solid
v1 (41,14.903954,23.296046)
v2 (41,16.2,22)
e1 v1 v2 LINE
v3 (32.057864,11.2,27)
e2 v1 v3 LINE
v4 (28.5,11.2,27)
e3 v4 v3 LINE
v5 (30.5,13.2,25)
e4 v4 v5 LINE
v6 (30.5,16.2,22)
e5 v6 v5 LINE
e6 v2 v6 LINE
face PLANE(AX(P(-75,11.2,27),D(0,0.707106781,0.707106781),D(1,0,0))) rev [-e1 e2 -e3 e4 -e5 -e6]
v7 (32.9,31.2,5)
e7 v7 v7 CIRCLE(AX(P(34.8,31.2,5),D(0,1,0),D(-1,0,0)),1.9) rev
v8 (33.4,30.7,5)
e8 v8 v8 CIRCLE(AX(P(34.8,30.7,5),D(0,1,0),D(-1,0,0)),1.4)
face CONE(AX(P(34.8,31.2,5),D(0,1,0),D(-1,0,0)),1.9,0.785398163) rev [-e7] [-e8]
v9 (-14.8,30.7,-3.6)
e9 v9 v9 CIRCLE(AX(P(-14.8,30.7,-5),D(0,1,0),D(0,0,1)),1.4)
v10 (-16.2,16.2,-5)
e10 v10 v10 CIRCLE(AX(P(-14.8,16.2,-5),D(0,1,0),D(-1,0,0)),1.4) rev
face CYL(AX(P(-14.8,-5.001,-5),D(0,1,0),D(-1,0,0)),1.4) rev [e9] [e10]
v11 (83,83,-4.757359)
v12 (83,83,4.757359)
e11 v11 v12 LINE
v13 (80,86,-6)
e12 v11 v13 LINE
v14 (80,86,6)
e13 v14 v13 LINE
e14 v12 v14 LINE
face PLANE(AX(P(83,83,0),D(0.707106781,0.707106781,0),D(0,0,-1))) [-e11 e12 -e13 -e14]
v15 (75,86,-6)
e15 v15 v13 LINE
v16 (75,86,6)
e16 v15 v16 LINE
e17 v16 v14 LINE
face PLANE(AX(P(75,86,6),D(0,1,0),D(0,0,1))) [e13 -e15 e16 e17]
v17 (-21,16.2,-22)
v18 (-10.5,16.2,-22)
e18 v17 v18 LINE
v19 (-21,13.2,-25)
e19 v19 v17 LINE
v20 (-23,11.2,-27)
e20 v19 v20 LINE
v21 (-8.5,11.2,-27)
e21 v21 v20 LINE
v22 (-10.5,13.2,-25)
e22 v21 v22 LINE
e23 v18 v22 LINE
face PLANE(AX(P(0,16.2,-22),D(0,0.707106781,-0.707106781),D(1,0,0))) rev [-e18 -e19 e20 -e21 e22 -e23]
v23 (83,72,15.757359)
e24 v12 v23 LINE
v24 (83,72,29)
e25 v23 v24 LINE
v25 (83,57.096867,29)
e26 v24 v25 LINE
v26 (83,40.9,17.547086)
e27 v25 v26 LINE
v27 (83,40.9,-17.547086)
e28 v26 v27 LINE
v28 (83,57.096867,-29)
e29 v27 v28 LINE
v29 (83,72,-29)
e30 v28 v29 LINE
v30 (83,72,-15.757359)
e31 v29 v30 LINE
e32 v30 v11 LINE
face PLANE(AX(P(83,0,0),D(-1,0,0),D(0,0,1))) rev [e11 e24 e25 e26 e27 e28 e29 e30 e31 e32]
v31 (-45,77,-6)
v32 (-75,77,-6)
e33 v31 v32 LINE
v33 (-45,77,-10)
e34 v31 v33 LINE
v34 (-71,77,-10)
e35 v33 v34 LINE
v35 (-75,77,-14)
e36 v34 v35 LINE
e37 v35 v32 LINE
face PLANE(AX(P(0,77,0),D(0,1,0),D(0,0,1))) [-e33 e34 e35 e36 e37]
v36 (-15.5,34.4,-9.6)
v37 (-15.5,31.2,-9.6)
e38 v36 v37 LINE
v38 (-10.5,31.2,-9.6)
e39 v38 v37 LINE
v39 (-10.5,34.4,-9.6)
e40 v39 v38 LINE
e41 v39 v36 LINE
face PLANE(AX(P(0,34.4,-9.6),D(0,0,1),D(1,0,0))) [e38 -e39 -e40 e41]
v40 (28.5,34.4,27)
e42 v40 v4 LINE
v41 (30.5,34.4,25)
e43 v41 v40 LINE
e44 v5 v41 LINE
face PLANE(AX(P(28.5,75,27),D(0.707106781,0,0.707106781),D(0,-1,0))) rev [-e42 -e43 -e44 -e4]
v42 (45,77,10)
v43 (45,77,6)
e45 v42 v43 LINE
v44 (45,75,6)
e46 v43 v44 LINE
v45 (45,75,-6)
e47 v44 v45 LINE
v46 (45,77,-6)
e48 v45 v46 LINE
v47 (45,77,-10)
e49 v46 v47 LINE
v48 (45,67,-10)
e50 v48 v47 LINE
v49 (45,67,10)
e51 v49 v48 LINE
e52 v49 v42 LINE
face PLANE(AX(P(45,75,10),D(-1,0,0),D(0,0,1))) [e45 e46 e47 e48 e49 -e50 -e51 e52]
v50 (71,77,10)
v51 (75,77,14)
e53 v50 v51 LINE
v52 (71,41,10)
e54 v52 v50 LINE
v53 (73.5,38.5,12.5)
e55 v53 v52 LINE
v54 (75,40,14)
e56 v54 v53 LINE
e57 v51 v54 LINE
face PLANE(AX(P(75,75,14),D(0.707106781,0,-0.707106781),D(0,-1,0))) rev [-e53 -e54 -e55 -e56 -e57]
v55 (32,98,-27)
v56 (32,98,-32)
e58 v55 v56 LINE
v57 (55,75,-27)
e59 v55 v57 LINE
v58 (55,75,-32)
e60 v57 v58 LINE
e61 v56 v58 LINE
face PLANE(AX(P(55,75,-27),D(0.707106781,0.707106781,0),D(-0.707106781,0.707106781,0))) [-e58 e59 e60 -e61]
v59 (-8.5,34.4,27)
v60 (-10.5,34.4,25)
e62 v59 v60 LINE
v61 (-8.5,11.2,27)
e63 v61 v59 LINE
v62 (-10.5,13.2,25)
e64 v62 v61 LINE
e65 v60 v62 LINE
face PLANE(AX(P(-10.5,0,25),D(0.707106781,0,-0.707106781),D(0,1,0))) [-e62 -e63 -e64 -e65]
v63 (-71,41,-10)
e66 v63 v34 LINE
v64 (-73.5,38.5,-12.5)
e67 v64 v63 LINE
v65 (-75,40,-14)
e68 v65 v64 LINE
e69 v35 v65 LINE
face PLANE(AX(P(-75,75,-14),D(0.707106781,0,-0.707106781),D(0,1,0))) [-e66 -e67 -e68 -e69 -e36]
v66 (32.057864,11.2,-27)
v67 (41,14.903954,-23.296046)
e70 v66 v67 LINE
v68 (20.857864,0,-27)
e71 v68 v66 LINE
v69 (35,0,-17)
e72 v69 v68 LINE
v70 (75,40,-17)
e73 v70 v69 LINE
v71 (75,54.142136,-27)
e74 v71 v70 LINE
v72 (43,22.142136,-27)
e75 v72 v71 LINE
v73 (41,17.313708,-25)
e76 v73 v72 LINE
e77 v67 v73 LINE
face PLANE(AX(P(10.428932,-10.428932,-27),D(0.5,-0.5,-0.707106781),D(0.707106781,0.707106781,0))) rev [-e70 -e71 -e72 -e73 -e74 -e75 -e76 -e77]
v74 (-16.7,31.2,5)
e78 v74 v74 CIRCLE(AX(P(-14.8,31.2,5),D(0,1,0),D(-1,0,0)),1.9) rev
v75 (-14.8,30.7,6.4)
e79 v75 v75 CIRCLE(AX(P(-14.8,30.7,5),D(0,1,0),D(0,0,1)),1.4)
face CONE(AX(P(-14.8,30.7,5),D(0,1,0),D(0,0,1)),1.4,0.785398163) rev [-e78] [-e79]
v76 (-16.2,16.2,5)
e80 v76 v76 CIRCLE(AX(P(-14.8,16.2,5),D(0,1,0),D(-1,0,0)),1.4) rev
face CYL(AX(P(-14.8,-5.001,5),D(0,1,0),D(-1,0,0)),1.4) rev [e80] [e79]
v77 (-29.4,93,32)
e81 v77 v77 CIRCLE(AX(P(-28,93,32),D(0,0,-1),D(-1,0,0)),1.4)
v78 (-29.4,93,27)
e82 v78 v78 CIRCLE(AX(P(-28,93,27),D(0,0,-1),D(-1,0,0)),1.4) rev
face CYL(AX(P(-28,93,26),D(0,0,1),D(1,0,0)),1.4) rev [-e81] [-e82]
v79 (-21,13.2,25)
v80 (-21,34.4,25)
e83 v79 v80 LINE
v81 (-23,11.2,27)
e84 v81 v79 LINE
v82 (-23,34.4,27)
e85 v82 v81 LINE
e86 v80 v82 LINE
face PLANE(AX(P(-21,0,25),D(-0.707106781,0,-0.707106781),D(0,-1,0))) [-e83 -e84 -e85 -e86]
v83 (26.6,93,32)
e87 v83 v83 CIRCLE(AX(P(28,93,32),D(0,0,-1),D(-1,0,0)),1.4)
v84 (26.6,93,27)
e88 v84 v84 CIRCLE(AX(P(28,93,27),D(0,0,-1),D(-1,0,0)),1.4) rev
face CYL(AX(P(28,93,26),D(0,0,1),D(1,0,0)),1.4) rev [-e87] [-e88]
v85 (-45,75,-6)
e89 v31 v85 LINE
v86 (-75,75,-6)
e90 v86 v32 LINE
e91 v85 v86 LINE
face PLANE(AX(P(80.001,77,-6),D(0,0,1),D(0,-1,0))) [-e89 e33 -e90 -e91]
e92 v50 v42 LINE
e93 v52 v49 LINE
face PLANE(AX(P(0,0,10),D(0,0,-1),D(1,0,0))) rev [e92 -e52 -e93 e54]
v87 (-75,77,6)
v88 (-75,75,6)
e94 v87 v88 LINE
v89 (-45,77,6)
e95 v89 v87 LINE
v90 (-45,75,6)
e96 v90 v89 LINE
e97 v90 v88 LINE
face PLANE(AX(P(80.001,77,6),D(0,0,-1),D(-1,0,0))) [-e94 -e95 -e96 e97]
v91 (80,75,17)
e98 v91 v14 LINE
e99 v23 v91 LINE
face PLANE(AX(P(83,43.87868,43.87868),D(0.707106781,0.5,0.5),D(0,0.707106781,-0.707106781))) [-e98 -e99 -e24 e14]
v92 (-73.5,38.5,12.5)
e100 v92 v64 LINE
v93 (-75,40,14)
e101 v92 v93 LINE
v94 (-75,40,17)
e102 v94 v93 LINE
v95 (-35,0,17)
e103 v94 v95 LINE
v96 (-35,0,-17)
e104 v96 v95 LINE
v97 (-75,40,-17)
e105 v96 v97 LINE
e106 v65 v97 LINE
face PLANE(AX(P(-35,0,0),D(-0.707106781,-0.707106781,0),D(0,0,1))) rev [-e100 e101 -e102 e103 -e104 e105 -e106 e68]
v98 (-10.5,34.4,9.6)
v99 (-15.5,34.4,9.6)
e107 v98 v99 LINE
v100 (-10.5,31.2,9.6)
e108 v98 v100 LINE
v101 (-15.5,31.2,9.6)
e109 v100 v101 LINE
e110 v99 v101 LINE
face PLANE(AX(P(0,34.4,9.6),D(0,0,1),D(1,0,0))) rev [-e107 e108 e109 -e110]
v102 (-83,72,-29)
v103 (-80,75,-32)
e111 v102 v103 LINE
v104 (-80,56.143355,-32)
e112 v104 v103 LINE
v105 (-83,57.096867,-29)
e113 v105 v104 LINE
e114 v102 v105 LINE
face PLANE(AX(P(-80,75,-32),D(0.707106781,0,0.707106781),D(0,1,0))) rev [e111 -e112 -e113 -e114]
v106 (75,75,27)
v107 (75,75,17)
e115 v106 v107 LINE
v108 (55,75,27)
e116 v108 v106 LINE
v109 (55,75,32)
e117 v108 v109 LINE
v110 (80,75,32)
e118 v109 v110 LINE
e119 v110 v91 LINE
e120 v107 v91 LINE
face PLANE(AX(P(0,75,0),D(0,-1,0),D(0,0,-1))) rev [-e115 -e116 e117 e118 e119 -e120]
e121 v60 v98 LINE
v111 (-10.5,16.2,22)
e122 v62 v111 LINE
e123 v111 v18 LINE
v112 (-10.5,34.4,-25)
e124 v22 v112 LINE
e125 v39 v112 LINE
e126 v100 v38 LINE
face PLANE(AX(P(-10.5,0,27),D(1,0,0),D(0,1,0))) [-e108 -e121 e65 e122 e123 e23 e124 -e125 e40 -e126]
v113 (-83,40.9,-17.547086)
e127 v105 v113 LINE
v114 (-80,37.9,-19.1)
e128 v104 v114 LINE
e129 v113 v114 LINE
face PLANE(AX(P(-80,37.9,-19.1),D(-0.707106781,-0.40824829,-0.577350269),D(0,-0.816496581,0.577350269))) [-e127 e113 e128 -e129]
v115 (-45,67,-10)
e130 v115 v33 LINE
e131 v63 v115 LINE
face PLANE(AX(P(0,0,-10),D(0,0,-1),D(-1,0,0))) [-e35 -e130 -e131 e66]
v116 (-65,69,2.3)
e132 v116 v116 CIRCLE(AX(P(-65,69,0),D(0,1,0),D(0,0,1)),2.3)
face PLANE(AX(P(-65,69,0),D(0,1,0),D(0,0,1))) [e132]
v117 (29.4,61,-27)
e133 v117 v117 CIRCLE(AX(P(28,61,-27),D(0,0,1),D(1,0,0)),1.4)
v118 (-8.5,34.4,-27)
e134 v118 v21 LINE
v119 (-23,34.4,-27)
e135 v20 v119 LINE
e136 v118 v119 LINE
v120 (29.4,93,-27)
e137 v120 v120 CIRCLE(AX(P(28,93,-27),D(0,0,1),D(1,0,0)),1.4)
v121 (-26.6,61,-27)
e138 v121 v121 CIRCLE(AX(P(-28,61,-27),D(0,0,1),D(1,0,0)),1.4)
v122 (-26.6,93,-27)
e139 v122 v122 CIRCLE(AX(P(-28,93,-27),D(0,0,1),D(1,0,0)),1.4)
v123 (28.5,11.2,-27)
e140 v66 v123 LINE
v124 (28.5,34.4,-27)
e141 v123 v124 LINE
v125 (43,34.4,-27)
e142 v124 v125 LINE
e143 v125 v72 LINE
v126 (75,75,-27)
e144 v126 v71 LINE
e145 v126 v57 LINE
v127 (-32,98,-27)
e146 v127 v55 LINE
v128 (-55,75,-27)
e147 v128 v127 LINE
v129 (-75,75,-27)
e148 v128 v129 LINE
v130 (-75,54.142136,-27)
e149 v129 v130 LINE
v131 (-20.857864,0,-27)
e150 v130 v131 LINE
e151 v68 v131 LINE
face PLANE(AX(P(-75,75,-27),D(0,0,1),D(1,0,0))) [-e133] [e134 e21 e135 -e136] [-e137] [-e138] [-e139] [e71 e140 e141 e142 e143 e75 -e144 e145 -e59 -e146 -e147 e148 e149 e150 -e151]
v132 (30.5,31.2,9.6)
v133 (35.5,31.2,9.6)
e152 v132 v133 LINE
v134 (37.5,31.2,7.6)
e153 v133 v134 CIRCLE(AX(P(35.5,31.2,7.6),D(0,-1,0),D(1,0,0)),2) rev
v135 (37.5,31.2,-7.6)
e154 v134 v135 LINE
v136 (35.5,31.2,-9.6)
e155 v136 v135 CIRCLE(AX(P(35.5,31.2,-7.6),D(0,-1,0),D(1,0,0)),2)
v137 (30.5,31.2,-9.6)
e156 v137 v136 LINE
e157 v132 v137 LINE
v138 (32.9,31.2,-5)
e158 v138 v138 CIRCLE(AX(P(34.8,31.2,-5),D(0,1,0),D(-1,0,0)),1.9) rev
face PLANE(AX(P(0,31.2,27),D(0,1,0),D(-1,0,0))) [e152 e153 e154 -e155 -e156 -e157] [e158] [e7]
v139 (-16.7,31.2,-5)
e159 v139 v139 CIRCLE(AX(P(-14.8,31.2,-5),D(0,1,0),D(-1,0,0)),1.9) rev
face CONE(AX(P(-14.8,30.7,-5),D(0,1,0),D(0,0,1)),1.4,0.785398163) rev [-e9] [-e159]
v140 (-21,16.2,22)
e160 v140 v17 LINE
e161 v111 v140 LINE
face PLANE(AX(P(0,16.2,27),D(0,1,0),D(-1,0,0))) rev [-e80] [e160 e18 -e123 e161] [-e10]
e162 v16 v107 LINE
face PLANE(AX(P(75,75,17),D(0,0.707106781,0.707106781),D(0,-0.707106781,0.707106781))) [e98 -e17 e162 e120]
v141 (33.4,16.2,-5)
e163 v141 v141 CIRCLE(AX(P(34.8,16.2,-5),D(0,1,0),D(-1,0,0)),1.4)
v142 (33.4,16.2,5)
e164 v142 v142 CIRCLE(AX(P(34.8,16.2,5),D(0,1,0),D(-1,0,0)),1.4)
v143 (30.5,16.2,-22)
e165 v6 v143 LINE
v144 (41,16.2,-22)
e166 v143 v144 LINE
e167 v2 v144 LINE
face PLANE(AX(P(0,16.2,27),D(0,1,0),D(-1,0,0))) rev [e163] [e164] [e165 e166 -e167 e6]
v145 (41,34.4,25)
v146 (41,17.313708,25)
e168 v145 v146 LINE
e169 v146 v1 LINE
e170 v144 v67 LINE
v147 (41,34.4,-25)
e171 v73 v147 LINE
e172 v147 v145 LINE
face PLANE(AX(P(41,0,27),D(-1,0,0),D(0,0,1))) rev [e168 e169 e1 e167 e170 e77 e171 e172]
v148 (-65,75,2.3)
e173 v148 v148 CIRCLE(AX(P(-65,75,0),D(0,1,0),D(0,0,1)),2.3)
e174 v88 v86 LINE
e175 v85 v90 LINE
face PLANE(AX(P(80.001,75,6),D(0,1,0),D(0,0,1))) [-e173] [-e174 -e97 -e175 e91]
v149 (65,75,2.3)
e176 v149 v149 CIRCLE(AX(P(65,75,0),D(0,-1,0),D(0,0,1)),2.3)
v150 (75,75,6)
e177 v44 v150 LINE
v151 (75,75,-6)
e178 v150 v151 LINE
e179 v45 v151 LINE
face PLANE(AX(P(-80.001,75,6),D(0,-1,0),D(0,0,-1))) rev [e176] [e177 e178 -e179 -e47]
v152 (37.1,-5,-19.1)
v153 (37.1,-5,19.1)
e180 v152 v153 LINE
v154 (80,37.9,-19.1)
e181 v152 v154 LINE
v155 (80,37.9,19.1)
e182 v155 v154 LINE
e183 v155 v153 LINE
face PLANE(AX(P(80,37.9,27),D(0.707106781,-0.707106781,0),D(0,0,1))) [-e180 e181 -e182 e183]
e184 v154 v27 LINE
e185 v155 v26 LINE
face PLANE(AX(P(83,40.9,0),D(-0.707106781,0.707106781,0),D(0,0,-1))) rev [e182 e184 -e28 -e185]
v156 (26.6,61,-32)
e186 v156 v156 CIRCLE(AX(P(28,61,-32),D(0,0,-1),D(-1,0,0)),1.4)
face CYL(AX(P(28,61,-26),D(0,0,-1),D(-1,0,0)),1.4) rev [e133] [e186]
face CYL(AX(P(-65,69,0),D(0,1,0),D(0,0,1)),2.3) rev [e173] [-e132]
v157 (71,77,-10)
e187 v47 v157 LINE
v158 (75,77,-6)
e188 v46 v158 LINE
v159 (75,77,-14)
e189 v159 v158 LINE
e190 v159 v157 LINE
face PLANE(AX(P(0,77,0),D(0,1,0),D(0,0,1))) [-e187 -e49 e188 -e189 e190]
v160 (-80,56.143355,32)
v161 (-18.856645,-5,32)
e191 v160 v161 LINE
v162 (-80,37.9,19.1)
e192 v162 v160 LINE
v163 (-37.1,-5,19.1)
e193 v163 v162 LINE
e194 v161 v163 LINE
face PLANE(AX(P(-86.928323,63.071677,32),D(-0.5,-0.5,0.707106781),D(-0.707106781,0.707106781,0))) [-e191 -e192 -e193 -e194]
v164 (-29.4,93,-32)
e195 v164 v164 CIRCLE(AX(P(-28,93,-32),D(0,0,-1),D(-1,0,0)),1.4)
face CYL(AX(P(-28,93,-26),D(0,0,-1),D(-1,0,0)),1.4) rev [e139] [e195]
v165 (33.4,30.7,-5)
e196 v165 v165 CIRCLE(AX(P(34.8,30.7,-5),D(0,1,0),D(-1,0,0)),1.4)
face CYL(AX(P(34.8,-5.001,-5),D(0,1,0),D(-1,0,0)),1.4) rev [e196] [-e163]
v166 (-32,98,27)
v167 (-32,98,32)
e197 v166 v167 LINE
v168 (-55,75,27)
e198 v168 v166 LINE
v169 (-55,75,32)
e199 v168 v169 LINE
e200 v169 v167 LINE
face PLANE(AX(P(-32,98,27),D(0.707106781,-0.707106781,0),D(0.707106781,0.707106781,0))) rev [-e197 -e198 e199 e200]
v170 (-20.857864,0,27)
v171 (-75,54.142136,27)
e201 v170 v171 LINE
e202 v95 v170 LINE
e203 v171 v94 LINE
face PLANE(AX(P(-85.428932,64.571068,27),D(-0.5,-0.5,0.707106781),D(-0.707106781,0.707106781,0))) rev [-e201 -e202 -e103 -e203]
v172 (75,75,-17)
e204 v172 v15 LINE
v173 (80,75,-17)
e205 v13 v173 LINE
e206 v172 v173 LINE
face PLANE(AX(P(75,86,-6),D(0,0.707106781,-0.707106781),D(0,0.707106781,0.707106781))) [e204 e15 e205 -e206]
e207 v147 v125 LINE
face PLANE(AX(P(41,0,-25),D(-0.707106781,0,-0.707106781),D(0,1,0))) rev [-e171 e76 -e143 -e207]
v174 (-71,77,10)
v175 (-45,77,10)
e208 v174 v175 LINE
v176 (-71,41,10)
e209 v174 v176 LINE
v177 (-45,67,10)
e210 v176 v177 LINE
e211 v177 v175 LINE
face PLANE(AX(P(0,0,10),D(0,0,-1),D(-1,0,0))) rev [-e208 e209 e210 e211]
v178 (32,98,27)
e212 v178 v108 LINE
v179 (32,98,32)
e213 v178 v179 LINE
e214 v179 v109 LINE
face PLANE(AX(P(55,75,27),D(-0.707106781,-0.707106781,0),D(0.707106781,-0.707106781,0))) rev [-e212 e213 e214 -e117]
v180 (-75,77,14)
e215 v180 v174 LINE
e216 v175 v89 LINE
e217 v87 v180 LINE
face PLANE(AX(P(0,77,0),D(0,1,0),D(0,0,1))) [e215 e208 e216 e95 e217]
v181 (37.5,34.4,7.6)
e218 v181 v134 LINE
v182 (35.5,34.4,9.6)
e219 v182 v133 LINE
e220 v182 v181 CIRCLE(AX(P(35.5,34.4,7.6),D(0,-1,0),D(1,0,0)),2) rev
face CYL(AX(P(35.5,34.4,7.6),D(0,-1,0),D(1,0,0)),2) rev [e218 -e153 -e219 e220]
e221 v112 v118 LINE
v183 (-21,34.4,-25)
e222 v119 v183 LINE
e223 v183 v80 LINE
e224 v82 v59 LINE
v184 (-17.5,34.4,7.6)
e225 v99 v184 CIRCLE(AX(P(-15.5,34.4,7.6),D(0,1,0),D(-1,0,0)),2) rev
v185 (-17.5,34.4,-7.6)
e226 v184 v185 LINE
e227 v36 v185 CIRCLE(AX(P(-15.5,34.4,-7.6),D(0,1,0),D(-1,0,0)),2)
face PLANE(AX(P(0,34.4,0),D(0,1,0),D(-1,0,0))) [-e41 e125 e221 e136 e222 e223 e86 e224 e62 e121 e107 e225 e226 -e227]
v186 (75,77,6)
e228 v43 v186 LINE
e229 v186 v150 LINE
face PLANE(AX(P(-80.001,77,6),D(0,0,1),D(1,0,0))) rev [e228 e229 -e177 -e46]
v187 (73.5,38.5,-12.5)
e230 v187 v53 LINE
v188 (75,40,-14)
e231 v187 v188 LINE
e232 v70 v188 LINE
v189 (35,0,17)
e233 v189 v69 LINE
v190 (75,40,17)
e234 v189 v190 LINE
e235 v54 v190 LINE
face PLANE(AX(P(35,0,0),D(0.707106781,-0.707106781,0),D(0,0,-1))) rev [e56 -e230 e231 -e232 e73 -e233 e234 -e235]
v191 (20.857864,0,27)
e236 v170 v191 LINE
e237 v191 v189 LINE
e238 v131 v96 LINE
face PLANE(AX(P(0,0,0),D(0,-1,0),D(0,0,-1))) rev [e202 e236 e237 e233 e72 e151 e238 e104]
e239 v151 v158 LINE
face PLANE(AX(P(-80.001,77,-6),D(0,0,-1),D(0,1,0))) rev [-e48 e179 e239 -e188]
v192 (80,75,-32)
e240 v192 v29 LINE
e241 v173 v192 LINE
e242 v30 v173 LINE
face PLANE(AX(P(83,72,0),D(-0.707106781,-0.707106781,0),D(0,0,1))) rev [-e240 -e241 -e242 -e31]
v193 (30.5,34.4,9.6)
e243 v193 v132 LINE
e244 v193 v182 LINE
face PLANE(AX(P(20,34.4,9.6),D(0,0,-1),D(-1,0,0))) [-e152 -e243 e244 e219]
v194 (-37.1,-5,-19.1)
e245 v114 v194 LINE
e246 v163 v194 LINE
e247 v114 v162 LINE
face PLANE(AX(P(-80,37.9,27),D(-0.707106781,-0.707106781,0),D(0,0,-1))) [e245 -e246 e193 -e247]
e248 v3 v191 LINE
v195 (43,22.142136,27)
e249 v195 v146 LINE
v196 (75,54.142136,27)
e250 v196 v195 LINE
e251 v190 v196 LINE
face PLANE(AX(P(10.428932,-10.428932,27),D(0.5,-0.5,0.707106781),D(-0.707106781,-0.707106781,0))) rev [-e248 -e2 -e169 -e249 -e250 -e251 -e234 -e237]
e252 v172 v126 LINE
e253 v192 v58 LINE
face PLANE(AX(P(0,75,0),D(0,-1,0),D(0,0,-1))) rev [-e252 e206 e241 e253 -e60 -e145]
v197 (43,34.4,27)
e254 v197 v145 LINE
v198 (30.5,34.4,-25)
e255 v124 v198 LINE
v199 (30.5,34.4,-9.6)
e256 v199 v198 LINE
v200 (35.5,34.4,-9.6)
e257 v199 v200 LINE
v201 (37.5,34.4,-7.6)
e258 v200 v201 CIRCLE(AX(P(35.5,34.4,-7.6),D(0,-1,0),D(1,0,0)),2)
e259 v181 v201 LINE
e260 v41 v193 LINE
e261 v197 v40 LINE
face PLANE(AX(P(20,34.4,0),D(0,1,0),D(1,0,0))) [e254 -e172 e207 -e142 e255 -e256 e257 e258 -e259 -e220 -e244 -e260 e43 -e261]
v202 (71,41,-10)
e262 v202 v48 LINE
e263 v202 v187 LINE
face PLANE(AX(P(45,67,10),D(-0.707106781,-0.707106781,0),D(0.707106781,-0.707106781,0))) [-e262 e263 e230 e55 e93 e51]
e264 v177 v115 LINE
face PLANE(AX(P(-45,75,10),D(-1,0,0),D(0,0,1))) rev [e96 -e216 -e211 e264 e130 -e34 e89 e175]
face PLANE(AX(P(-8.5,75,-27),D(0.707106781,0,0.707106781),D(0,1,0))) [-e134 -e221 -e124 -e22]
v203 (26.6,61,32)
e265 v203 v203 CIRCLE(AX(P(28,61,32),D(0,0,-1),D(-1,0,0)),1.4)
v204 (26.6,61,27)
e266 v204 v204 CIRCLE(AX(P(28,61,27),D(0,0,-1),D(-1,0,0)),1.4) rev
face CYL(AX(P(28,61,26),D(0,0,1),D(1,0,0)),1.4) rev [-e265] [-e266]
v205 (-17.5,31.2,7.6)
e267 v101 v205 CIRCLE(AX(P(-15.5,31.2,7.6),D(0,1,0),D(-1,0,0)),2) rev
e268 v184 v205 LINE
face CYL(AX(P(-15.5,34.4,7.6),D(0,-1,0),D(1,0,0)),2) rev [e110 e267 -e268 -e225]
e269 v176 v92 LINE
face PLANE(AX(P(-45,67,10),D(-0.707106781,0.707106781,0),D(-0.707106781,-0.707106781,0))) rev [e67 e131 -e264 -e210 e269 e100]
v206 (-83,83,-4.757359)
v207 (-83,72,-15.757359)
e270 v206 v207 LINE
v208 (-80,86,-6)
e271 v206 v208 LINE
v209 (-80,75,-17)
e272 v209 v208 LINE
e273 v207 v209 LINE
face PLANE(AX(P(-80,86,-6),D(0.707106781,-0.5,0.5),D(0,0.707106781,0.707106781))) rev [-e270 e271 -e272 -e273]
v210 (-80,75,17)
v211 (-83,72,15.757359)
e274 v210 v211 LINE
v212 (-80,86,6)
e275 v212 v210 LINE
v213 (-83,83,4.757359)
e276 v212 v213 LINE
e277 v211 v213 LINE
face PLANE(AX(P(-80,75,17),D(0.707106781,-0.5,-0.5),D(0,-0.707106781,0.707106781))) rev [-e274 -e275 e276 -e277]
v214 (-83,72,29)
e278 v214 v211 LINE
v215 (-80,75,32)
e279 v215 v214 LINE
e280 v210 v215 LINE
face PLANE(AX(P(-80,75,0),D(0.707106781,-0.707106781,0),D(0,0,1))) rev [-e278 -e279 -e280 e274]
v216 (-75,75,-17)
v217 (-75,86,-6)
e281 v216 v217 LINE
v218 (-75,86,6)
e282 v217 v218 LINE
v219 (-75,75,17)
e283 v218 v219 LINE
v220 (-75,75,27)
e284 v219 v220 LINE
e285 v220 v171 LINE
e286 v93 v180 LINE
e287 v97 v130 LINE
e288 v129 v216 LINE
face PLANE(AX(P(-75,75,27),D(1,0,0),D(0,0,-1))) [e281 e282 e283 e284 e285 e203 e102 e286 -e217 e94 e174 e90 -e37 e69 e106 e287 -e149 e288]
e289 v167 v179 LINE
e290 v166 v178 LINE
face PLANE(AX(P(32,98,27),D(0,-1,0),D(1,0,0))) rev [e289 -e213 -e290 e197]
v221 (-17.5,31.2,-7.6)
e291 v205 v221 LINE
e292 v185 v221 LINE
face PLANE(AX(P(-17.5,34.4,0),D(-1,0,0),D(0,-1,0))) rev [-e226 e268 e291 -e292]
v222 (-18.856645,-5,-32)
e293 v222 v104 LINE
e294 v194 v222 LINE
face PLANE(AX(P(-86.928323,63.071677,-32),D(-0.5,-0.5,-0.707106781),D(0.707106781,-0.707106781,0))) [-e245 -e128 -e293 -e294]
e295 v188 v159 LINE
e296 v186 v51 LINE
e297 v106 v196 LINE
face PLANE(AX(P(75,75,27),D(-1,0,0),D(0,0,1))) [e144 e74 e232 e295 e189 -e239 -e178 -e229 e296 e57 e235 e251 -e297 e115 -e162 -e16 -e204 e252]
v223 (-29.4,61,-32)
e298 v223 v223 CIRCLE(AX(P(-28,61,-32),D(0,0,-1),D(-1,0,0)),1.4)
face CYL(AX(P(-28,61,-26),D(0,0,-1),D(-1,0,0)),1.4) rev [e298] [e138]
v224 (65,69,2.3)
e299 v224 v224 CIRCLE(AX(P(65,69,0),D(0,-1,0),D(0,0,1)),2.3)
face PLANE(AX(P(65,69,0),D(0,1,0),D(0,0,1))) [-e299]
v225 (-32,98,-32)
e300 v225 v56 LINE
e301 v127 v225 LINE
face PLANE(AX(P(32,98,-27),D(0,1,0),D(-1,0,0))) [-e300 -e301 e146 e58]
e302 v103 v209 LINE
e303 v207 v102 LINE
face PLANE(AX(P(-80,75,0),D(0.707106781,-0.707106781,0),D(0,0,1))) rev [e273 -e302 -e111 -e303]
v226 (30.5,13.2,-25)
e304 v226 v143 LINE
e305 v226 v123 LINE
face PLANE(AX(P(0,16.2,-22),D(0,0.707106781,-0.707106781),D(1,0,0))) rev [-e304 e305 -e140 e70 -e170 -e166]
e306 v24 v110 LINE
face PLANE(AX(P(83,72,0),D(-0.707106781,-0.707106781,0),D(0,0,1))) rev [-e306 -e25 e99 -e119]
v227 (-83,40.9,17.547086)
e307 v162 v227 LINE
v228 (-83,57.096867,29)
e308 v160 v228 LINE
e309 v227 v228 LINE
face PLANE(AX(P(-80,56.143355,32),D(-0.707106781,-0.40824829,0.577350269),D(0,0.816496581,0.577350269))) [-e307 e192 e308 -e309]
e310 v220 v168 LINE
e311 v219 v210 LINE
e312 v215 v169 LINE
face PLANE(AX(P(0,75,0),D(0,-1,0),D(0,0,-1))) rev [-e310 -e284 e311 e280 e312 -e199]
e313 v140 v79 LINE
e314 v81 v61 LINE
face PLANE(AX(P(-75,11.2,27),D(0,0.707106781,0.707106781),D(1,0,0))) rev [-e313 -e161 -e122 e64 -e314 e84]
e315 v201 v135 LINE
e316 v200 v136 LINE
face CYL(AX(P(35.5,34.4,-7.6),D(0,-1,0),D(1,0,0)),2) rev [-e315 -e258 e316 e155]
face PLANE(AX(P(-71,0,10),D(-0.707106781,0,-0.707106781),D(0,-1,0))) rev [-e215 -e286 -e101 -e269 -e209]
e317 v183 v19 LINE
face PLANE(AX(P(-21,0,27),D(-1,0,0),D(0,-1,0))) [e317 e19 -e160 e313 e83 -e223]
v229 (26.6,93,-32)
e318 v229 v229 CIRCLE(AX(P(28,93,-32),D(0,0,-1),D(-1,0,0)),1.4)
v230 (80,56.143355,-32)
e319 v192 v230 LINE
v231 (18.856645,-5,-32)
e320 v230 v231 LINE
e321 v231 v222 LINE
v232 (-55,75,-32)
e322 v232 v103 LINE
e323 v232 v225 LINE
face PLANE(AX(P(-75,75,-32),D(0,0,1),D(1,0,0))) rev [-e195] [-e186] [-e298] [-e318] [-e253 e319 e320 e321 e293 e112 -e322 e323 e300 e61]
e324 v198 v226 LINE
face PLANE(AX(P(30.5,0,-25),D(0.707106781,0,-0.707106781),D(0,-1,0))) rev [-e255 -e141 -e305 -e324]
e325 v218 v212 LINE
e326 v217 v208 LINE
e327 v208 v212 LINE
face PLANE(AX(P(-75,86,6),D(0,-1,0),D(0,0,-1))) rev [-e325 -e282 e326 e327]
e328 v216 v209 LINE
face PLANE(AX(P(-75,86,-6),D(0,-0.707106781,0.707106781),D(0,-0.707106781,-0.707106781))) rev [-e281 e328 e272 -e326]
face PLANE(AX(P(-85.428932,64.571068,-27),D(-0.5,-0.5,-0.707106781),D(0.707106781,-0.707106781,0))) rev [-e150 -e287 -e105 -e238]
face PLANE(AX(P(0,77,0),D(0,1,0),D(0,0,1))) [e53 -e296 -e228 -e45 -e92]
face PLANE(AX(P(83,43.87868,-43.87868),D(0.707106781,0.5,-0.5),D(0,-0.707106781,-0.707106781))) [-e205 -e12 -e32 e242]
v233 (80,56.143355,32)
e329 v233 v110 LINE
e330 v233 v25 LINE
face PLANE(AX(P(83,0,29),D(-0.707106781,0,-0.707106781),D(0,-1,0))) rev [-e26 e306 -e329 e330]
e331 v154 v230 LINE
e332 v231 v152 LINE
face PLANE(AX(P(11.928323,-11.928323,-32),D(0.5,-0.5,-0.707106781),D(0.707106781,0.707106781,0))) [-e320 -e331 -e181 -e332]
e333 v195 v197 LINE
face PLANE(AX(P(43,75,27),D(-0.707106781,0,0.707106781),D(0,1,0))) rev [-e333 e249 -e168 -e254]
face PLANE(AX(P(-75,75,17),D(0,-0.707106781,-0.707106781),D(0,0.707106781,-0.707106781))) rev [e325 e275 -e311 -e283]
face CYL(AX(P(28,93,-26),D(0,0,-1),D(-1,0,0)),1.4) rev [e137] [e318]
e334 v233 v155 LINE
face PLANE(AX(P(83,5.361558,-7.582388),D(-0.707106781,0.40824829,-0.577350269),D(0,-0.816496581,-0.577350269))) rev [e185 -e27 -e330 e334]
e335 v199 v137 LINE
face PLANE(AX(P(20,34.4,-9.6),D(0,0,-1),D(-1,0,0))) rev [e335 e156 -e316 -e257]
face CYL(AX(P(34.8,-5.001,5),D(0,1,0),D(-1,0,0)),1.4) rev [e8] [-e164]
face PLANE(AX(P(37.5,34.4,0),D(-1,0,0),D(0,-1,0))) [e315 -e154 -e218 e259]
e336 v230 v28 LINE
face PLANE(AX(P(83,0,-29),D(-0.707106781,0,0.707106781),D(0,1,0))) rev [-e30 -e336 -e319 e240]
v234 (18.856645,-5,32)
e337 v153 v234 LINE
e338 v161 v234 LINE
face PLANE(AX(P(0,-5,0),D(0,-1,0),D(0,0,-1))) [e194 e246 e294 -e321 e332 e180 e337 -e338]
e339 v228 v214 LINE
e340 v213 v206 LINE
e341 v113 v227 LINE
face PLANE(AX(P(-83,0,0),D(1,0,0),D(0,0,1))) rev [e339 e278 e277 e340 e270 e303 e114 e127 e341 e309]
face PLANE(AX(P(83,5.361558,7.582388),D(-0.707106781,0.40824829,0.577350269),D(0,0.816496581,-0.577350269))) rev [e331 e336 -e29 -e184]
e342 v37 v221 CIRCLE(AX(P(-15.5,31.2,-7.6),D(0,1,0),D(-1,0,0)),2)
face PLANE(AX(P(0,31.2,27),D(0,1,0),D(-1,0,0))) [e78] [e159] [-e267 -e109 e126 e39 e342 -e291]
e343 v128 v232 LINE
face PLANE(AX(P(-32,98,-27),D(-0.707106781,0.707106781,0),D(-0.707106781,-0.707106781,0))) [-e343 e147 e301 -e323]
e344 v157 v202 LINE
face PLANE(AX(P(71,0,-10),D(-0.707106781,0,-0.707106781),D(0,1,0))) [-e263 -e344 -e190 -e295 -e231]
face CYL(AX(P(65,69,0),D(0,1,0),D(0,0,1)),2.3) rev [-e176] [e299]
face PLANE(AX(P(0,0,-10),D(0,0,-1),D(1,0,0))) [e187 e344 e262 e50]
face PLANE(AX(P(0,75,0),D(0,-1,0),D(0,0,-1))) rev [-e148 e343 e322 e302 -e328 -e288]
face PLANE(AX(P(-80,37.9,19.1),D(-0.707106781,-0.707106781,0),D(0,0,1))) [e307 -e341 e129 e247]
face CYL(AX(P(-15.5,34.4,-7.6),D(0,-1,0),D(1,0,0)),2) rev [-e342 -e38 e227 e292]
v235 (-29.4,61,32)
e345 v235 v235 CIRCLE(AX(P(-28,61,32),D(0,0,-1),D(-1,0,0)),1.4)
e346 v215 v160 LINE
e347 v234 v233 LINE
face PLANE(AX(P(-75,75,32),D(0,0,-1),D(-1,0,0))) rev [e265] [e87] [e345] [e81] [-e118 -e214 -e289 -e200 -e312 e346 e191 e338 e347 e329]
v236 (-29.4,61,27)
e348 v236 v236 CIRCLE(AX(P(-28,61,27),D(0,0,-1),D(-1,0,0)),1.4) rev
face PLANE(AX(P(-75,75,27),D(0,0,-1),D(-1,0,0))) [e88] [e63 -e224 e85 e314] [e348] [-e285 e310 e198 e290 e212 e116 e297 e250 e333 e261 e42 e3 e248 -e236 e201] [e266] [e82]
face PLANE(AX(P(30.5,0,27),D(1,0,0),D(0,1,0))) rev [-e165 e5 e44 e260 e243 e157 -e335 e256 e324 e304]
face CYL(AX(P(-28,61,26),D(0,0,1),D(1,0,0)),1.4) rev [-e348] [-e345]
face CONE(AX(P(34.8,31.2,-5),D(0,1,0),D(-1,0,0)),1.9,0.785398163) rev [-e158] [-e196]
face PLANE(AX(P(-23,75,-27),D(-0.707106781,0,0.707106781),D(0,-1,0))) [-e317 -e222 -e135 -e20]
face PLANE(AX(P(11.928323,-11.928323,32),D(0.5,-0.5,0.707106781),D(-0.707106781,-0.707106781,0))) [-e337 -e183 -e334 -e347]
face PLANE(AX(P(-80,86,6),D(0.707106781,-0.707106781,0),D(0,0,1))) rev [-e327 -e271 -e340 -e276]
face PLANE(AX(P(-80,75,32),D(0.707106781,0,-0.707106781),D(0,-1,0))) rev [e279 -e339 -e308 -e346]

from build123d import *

# Parameters (mm, degrees)
SKETCH1_W                  = 150
SKETCH1_H                  = 54
BOSS_EXTRUDE1_DEPTH        = 75
SHELL1_T                   = 5
BOSS_EXTRUDE2_DEPTH        = 5
BOSS_EXTRUDE3_DEPTH        = 5
SKETCH3_R                  = 1.4
CUT_EXTRUDE1_DEPTH         = 6
BOSS_EXTRUDE4_DEPTH        = 10
SKETCH9_W                  = 30
SKETCH9_H                  = 20
BOSS_EXTRUDE6_DEPTH        = 2
CUT_EXTRUDE2_REACH         = 188.153
SKETCH10_W                 = 12
SKETCH10_H                 = 2
SKETCH11_R                 = 2.3
CUT_EXTRUDE3_DEPTH         = 6
SKETCH13_W                 = 10.5
SKETCH13_H                 = 15
BOSS_EXTRUDE8_DEPTH        = 27
BOSS_EXTRUDE9_DEPTH        = 3.2
CUT_EXTRUDE4_REACH         = 111.024
SKETCH15_R                 = 1.4
CHAMFER8_SIZE              = 0.5
CHAMFER8_OF_MIRROR6_SIZE   = 0.5
CHAMFER3_SIZE              = 40
CHAMFER5_SIZE              = 42.9
CHAMFER9_SIZE              = 5
CHAMFER10_SIZE             = 2
CHAMFER11_SIZE             = 10
CHAMFER12_SIZE             = 12.9
CHAMFER13_SIZE             = 4
BOSS_EXTRUDE10_DEPTH       = 3
CHAMFER14_SIZE             = 3
CHAMFER14_OF_MIRROR28_SIZE = 3


# Some blends are built 0.0001 mm under size
with BuildPart() as part:
    # Sketch1 → Boss-Extrude1 (new body)
    with BuildSketch(Plane(origin=(0, 0, 0), x_dir=(1, 0, 0), z_dir=(0, 1, 0))):
        Rectangle(SKETCH1_W, SKETCH1_H)
    extrude(amount=BOSS_EXTRUDE1_DEPTH)

    # Shell1
    shell1_openings = [part.faces().sort_by_distance(p)[0] for p in [
        (0, 75, 0),
    ]]
    offset(amount=SHELL1_T, openings=shell1_openings, kind=Kind.INTERSECTION)

    # Sketch2 → Boss-Extrude2 (add)
    with BuildSketch(Plane(origin=(80, 0, 0), x_dir=(0, 0, -1), z_dir=(1, 0, 0))):
        Polygon((-17, 75), (-6, 86), (6, 86), (17, 75), align=None)
    boss_extrude2 = extrude(amount=-BOSS_EXTRUDE2_DEPTH)

    # Sketch4 → Boss-Extrude3 (add)
    with BuildSketch(Plane(origin=(0, 0, -32), x_dir=(-1, 0, 0), z_dir=(0, 0, -1))):
        Polygon((-55, 75), (-32, 98), (32, 98), (55, 75), align=None)
    boss_extrude3 = extrude(amount=-BOSS_EXTRUDE3_DEPTH)

    # Sketch3 → Cut-Extrude1 (cut)
    with BuildSketch(Plane(origin=(0, 0, -32), x_dir=(-1, 0, 0), z_dir=(0, 0, -1))):
        with Locations((-28, 93)):
            Circle(SKETCH3_R)
        with Locations((-28, 61)):
            Circle(SKETCH3_R)
        with Locations((28, 93)):
            Circle(SKETCH3_R)
        with Locations((28, 61)):
            Circle(SKETCH3_R)
    cut_extrude1 = extrude(amount=-CUT_EXTRUDE1_DEPTH, mode=Mode.SUBTRACT)

    # Mirror4: Boss-Extrude3, Cut-Extrude1 across plane
    add(boss_extrude3.mirror(Plane.XY))
    add(cut_extrude1.mirror(Plane.XY), mode=Mode.SUBTRACT)

    # Mirror5: Boss-Extrude2 across plane
    add(boss_extrude2.mirror(Plane(origin=(0, 0, 0), x_dir=(0, 0, 1), z_dir=(1, 0, 0))))

    # Sketch5 → Boss-Extrude4 (add, symmetric)
    with BuildSketch(Plane.XY):
        Polygon((-75, 75), (-45, 75), (-45, 67), (-75, 37), align=None)
    boss_extrude4 = extrude(amount=BOSS_EXTRUDE4_DEPTH, both=True)

    # Sketch9 → Boss-Extrude6 (add)
    with BuildSketch(Plane(origin=(0, 75, 0), x_dir=(1, 0, 0), z_dir=(0, 1, 0))):
        with Locations((-60, 0)):
            Rectangle(SKETCH9_W, SKETCH9_H)
    boss_extrude6 = extrude(amount=BOSS_EXTRUDE6_DEPTH)

    # Sketch10 → Cut-Extrude2 (cut, up to next)
    with BuildSketch(Plane(origin=(-75, 0, 0), x_dir=(0, 0, -1), z_dir=(1, 0, 0)), mode=Mode.PRIVATE) as cut_extrude2_sk1:
        with Locations((0, 76)):
            Rectangle(SKETCH10_W, SKETCH10_H)
    cut_extrude2_tool1 = extrude(cut_extrude2_sk1.sketch, amount=CUT_EXTRUDE2_REACH, mode=Mode.PRIVATE) & part.part
    cut_extrude2 = cut_extrude2_tool1.solids().sort_by_distance((-75, 76, 0))[0]
    add(cut_extrude2, mode=Mode.SUBTRACT)

    # Sketch11 → Cut-Extrude3 (cut)
    with BuildSketch(Plane(origin=(0, 75, 0), x_dir=(1, 0, 0), z_dir=(0, 1, 0))):
        with Locations(Location((-65, 0, 0), (0, 0, 270))):
            Circle(SKETCH11_R)
    cut_extrude3 = extrude(amount=-CUT_EXTRUDE3_DEPTH, mode=Mode.SUBTRACT)

    # Mirror24: Boss-Extrude4, Boss-Extrude6, Cut-Extrude2, Cut-Extrude3 across plane
    add(boss_extrude4.mirror(Plane(origin=(0, 0, 0), x_dir=(0, 0, 1), z_dir=(1, 0, 0))))
    add(boss_extrude6.mirror(Plane(origin=(0, 0, 0), x_dir=(0, 0, 1), z_dir=(1, 0, 0))))
    add(cut_extrude2.mirror(Plane(origin=(0, 0, 0), x_dir=(0, 0, 1), z_dir=(1, 0, 0))), mode=Mode.SUBTRACT)
    add(cut_extrude3.mirror(Plane(origin=(0, 0, 0), x_dir=(0, 0, 1), z_dir=(1, 0, 0))), mode=Mode.SUBTRACT)

    # Sketch13 → Boss-Extrude8 (add, symmetric)
    with BuildSketch(Plane.XY):
        with Locations((35.75, 23.7)):
            Rectangle(SKETCH13_W, SKETCH13_H)
        with Locations((-15.75, 23.7)):
            Rectangle(SKETCH13_W, SKETCH13_H)
    extrude(amount=BOSS_EXTRUDE8_DEPTH, both=True)

    # Sketch14 → Boss-Extrude9 (add)
    with BuildSketch(Plane(origin=(0, 31.2, 0), x_dir=(1, 0, 0), z_dir=(0, 1, 0))):
        with BuildLine():
            Line((-10.5, -27), (-10.5, -9.6))
            Line((-10.5, -9.6), (-15.5, -9.6))
            ThreePointArc((-15.5, -9.6), (-16.914213562, -9.014213562), (-17.5, -7.6))
            Line((-17.5, -7.6), (-17.5, 7.6))
            ThreePointArc((-17.5, 7.6), (-16.914213562, 9.014213562), (-15.5, 9.6))
            Line((-15.5, 9.6), (-10.5, 9.6))
            Line((-10.5, 9.6), (-10.5, 27))
            Line((-10.5, 27), (-21, 27))
            Line((-21, 27), (-21, -27))
            Line((-21, -27), (-10.5, -27))
        make_face()
    boss_extrude9 = extrude(amount=BOSS_EXTRUDE9_DEPTH)

    # Sketch15 → Cut-Extrude4 (cut, up to next)
    with BuildSketch(Plane(origin=(0, 31.2, 0), x_dir=(1, 0, 0), z_dir=(0, 1, 0)), mode=Mode.PRIVATE) as cut_extrude4_sk1:
        with Locations(Location((-14.8, 5, 0), (0, 0, 180))):
            Circle(SKETCH15_R)
    cut_extrude4_tool1 = extrude(cut_extrude4_sk1.sketch, amount=-CUT_EXTRUDE4_REACH, mode=Mode.PRIVATE) & part.part
    # Sketch15 → Cut-Extrude4 (cut, up to next)
    with BuildSketch(Plane(origin=(0, 31.2, 0), x_dir=(1, 0, 0), z_dir=(0, 1, 0)), mode=Mode.PRIVATE) as cut_extrude4_sk2:
        with Locations(Location((-14.8, -5, 0), (0, 0, 180))):
            Circle(SKETCH15_R)
    cut_extrude4_tool2 = extrude(cut_extrude4_sk2.sketch, amount=-CUT_EXTRUDE4_REACH, mode=Mode.PRIVATE) & part.part
    cut_extrude4_1 = cut_extrude4_tool1.solids().sort_by_distance((-14.8, 31.2, -5))[0]
    add(cut_extrude4_1, mode=Mode.SUBTRACT)
    cut_extrude4_2 = cut_extrude4_tool2.solids().sort_by_distance((-14.8, 31.2, 5))[0]
    add(cut_extrude4_2, mode=Mode.SUBTRACT)
    cut_extrude4 = cut_extrude4_1 + cut_extrude4_2  # Cut-Extrude4 as one shape, for the pattern or mirror that repeats it

    # Chamfer8
    chamfer8_edges = [part.edges().sort_by_distance(p)[0] for p in [
        (-13.4, 31.2, -5),
        (-13.4, 31.2, 5),
    ]]
    chamfer(chamfer8_edges, length=CHAMFER8_SIZE)

    # Mirror6: Boss-Extrude9, Cut-Extrude4 across plane
    add(boss_extrude9.mirror(Plane(origin=(10, 0, 0), x_dir=(0, 0, 1), z_dir=(1, 0, 0))))
    add(cut_extrude4.mirror(Plane(origin=(10, 0, 0), x_dir=(0, 0, 1), z_dir=(1, 0, 0))), mode=Mode.SUBTRACT)

    # Chamfer8 of Mirror6
    chamfer8_of_mirror6_edges = [part.edges().sort_by_distance(p)[0] for p in [
        (33.4, 31.2, -5),
        (33.4, 31.2, 5),
    ]]
    chamfer(chamfer8_of_mirror6_edges, length=CHAMFER8_OF_MIRROR6_SIZE)

    # Chamfer3
    # the kernel refuses this chamfer: 40 mm, written as the material it adds along each edge
    with BuildSketch(Plane(origin=(75, 0, 27), x_dir=(0.027495876610586317, 0.9996219169112968, 0), z_dir=(0, 0, -1)), Plane(origin=(-75, 0, -27), x_dir=(-0.027495876610586317, 0.9996219169112968, 0), z_dir=(0, 0, 1))) as chamfer3_piece_1:
        Polygon((CHAMFER3_SIZE * 0.999621916911, -CHAMFER3_SIZE * 0.0274958766106), (-CHAMFER3_SIZE * 0.0274958766106, -CHAMFER3_SIZE * 0.999621916911), (0, 0), align=None)
    extrude(amount=54)

    # Chamfer5
    chamfer5_edges = [part.edges().sort_by_distance(p)[0] for p in [
        (-80, -5, 0),
        (80, -5, 0),
    ]]
    chamfer(chamfer5_edges, length=CHAMFER5_SIZE)

    # Chamfer9
    chamfer9_edges = [part.edges().sort_by_distance(p)[0] for p in [
        (35.75, 16.2, -27),
        (35.75, 16.2, 27),
        (-15.75, 16.2, -27),
        (-15.75, 16.2, 27),
    ]]
    chamfer(chamfer9_edges, length=CHAMFER9_SIZE)

    # Chamfer10
    chamfer10_edges = [part.edges().sort_by_distance(p)[0] for p in [
        (30.5, 22.8, -27),
        (41, 22.8, -27),
        (30.5, 22.8, 27),
        (41, 22.8, 27),
        (-10.5, 22.8, 27),
        (-21, 22.8, 27),
        (-10.5, 22.8, -27),
        (-21, 22.8, -27),
    ]]
    chamfer(chamfer10_edges, length=CHAMFER10_SIZE)

    # Chamfer11
    # the kernel refuses this chamfer: 10 mm, written as the material it adds along each edge
    with BuildSketch(Plane(origin=(93.184544799, 58.184544799, 27), x_dir=(-0.7068394360703909, 0.706839436070956, 0.027495876610586303), z_dir=(-0.7071067811868302, -0.7071067811862648, 0))) as chamfer11_piece_1_section:
        Polygon((CHAMFER11_SIZE * 0.999621916911, CHAMFER11_SIZE * 0.0274958766106), (-CHAMFER11_SIZE * 0.0274958766106, CHAMFER11_SIZE * 0.999621916911), (0, 0), align=None)
    chamfer11_piece_1 = extrude(amount=108.002202254, mode=Mode.PRIVATE)
    chamfer11_piece_1 = split(chamfer11_piece_1, bisect_by=Plane(origin=(75, 22.474171504, 23.809556955), z_dir=(-1, 0, 0)), keep=Keep.TOP, mode=Mode.PRIVATE)
    chamfer11_piece_1 = split(chamfer11_piece_1, bisect_by=Plane(origin=(52.525828496, 0, 23.809556955), z_dir=(0, 1, 0)), keep=Keep.TOP, mode=Mode.PRIVATE)
    add(chamfer11_piece_1)
    with BuildSketch(Plane(origin=(93.184544799, 58.184544799, -27), x_dir=(-0.7068394360703909, 0.7068394360709561, -0.027495876610586348), z_dir=(-0.7071067811868302, -0.7071067811862648, 0))) as chamfer11_piece_2_section:
        Polygon((CHAMFER11_SIZE * 0.999621916911, -CHAMFER11_SIZE * 0.0274958766106), (-CHAMFER11_SIZE * 0.0274958766106, -CHAMFER11_SIZE * 0.999621916911), (0, 0), align=None)
    chamfer11_piece_2 = extrude(amount=108.002202254, mode=Mode.PRIVATE)
    chamfer11_piece_2 = split(chamfer11_piece_2, bisect_by=Plane(origin=(75, 22.474171504, -23.809556955), z_dir=(-1, 0, 0)), keep=Keep.TOP, mode=Mode.PRIVATE)
    chamfer11_piece_2 = split(chamfer11_piece_2, bisect_by=Plane(origin=(52.525828496, 0, -23.809556955), z_dir=(0, 1, 0)), keep=Keep.TOP, mode=Mode.PRIVATE)
    add(chamfer11_piece_2)
    with BuildSketch(Plane(origin=(-93.184544799, 58.184544799, -27), x_dir=(0.7068394360703909, 0.706839436070956, -0.027495876610586303), z_dir=(0.7071067811868302, -0.7071067811862648, 0))) as chamfer11_piece_3_section:
        Polygon((CHAMFER11_SIZE * 0.999621916911, CHAMFER11_SIZE * 0.0274958766106), (-CHAMFER11_SIZE * 0.0274958766106, CHAMFER11_SIZE * 0.999621916911), (0, 0), align=None)
    chamfer11_piece_3 = extrude(amount=108.002202254, mode=Mode.PRIVATE)
    chamfer11_piece_3 = split(chamfer11_piece_3, bisect_by=Plane(origin=(-75, 22.474171504, -23.809556955), z_dir=(1, 0, 0)), keep=Keep.TOP, mode=Mode.PRIVATE)
    chamfer11_piece_3 = split(chamfer11_piece_3, bisect_by=Plane(origin=(-52.525828496, 0, -23.809556955), z_dir=(0, 1, 0)), keep=Keep.TOP, mode=Mode.PRIVATE)
    add(chamfer11_piece_3)
    with BuildSketch(Plane(origin=(-93.184544799, 58.184544799, 27), x_dir=(0.7068394360703909, 0.7068394360709561, 0.027495876610586334), z_dir=(0.7071067811868302, -0.7071067811862648, 0))) as chamfer11_piece_4_section:
        Polygon((CHAMFER11_SIZE * 0.999621916911, -CHAMFER11_SIZE * 0.0274958766106), (-CHAMFER11_SIZE * 0.0274958766106, -CHAMFER11_SIZE * 0.999621916911), (0, 0), align=None)
    chamfer11_piece_4 = extrude(amount=108.002202254, mode=Mode.PRIVATE)
    chamfer11_piece_4 = split(chamfer11_piece_4, bisect_by=Plane(origin=(-75, 22.474171504, 23.809556955), z_dir=(1, 0, 0)), keep=Keep.TOP, mode=Mode.PRIVATE)
    chamfer11_piece_4 = split(chamfer11_piece_4, bisect_by=Plane(origin=(-52.525828496, 0, 23.809556955), z_dir=(0, 1, 0)), keep=Keep.TOP, mode=Mode.PRIVATE)
    add(chamfer11_piece_4)

    # Chamfer12
    chamfer12_edges = [part.edges().sort_by_distance(p)[0] for p in [
        (-58.55, 16.45, -32),
        (58.55, 16.45, -32),
        (-58.55, 16.45, 32),
        (58.55, 16.45, 32),
    ]]
    chamfer(chamfer12_edges, length=CHAMFER12_SIZE)

    # Chamfer13
    # the kernel refuses this chamfer: 4 mm, written as the material it adds along each edge
    with BuildSketch(Plane(origin=(-75, 29.713268048, 10), x_dir=(-0.027495876610585623, 0, 0.9996219169112968), z_dir=(0, 1, 0))) as chamfer13_piece_1_section:
        Polygon((CHAMFER13_SIZE * 0.999621916911, CHAMFER13_SIZE * 0.0274958766106), (-CHAMFER13_SIZE * 0.0274958766106, CHAMFER13_SIZE * 0.999621916911), (0, 0), align=None)
    chamfer13_piece_1 = extrude(amount=47.286731952, mode=Mode.PRIVATE)
    chamfer13_piece_1 = split(chamfer13_piece_1, bisect_by=Plane(origin=(-63.755995162, 48.244004838, 11.33377678), z_dir=(-0.7071067811865515, 0.7071067811865436, 0)), keep=Keep.TOP, mode=Mode.PRIVATE)
    add(chamfer13_piece_1)
    with BuildSketch(Plane(origin=(-75, 77, -10), x_dir=(-0.027495876610737532, 0, -0.9996219169112927), z_dir=(0, -1, 0))) as chamfer13_piece_2_section:
        Polygon((CHAMFER13_SIZE * 0.999621916911, CHAMFER13_SIZE * 0.0274958766106), (-CHAMFER13_SIZE * 0.0274958766107, CHAMFER13_SIZE * 0.999621916911), (0, 0), align=None)
    chamfer13_piece_2 = extrude(amount=47.286731952, mode=Mode.PRIVATE)
    chamfer13_piece_2 = split(chamfer13_piece_2, bisect_by=Plane(origin=(-63.755995162, 48.244004838, -11.33377678), z_dir=(-0.7071067811865515, 0.7071067811865436, 0)), keep=Keep.TOP, mode=Mode.PRIVATE)
    add(chamfer13_piece_2)
    with BuildSketch(Plane(origin=(75, 77, 10), x_dir=(0.02749587661043717, 0, 0.9996219169113009), z_dir=(0, -1, 0))) as chamfer13_piece_3_section:
        Polygon((CHAMFER13_SIZE * 0.999621916911, CHAMFER13_SIZE * 0.0274958766106), (-CHAMFER13_SIZE * 0.0274958766104, CHAMFER13_SIZE * 0.999621916911), (0, 0), align=None)
    chamfer13_piece_3 = extrude(amount=47.286731952, mode=Mode.PRIVATE)
    chamfer13_piece_3 = split(chamfer13_piece_3, bisect_by=Plane(origin=(63.755995162, 48.244004838, 11.33377678), z_dir=(0.7071067811865515, 0.7071067811865436, 0)), keep=Keep.TOP, mode=Mode.PRIVATE)
    add(chamfer13_piece_3)
    with BuildSketch(Plane(origin=(75, 29.713268048, -10), x_dir=(0.027495876610585623, 0, -0.9996219169112968), z_dir=(0, 1, 0))) as chamfer13_piece_4_section:
        Polygon((CHAMFER13_SIZE * 0.999621916911, CHAMFER13_SIZE * 0.0274958766106), (-CHAMFER13_SIZE * 0.0274958766106, CHAMFER13_SIZE * 0.999621916911), (0, 0), align=None)
    chamfer13_piece_4 = extrude(amount=47.286731952, mode=Mode.PRIVATE)
    chamfer13_piece_4 = split(chamfer13_piece_4, bisect_by=Plane(origin=(63.755995162, 48.244004838, -11.33377678), z_dir=(0.7071067811865515, 0.7071067811865436, 0)), keep=Keep.TOP, mode=Mode.PRIVATE)
    add(chamfer13_piece_4)

    # Sketch16 → Boss-Extrude10 (add)
    with BuildSketch(Plane(origin=(80, 0, 0), x_dir=(0, 0, -1), z_dir=(1, 0, 0))):
        Polygon((-19.1, 37.9), (19.1, 37.9), (32, 56.143354955), (32, 75), (17, 75), (6, 86), (-6, 86), (-17, 75), (-32, 75), (-32, 56.143354955), align=None)
    boss_extrude10 = extrude(amount=BOSS_EXTRUDE10_DEPTH)

    # Chamfer14
    chamfer14_edges = [part.edges().sort_by_distance(p)[0] for p in [
        (83, 65.571677477, 32),
        (83, 75, 24.5),
        (83, 80.5, 11.5),
        (83, 86, 0),
        (83, 80.5, -11.5),
        (83, 75, -24.5),
        (83, 65.571677477, -32),
        (83, 47.021677477, -25.55),
        (83, 37.9, 0),
        (83, 47.021677477, 25.55),
    ]]
    chamfer(chamfer14_edges, length=CHAMFER14_SIZE - 0.0001)  # a hair under: the kernel refuses the full size

    # Mirror28: Boss-Extrude10 across plane
    add(boss_extrude10.mirror(Plane(origin=(0, 0, 0), x_dir=(0, 0, 1), z_dir=(1, 0, 0))))

    # Chamfer14 of Mirror28
    chamfer14_of_mirror28_edges = [part.edges().sort_by_distance(p)[0] for p in [
        (-83, 65.571677477, 32),
        (-83, 75, 24.5),
        (-83, 80.5, 11.5),
        (-83, 86, 0),
        (-83, 80.5, -11.5),
        (-83, 75, -24.5),
        (-83, 65.571677477, -32),
        (-83, 47.021677477, -25.55),
        (-83, 37.9, 0),
        (-83, 47.021677477, 25.55),
    ]]
    chamfer(chamfer14_of_mirror28_edges, length=CHAMFER14_OF_MIRROR28_SIZE - 0.0001)  # a hair under: the kernel refuses the full size


solid = part.part
